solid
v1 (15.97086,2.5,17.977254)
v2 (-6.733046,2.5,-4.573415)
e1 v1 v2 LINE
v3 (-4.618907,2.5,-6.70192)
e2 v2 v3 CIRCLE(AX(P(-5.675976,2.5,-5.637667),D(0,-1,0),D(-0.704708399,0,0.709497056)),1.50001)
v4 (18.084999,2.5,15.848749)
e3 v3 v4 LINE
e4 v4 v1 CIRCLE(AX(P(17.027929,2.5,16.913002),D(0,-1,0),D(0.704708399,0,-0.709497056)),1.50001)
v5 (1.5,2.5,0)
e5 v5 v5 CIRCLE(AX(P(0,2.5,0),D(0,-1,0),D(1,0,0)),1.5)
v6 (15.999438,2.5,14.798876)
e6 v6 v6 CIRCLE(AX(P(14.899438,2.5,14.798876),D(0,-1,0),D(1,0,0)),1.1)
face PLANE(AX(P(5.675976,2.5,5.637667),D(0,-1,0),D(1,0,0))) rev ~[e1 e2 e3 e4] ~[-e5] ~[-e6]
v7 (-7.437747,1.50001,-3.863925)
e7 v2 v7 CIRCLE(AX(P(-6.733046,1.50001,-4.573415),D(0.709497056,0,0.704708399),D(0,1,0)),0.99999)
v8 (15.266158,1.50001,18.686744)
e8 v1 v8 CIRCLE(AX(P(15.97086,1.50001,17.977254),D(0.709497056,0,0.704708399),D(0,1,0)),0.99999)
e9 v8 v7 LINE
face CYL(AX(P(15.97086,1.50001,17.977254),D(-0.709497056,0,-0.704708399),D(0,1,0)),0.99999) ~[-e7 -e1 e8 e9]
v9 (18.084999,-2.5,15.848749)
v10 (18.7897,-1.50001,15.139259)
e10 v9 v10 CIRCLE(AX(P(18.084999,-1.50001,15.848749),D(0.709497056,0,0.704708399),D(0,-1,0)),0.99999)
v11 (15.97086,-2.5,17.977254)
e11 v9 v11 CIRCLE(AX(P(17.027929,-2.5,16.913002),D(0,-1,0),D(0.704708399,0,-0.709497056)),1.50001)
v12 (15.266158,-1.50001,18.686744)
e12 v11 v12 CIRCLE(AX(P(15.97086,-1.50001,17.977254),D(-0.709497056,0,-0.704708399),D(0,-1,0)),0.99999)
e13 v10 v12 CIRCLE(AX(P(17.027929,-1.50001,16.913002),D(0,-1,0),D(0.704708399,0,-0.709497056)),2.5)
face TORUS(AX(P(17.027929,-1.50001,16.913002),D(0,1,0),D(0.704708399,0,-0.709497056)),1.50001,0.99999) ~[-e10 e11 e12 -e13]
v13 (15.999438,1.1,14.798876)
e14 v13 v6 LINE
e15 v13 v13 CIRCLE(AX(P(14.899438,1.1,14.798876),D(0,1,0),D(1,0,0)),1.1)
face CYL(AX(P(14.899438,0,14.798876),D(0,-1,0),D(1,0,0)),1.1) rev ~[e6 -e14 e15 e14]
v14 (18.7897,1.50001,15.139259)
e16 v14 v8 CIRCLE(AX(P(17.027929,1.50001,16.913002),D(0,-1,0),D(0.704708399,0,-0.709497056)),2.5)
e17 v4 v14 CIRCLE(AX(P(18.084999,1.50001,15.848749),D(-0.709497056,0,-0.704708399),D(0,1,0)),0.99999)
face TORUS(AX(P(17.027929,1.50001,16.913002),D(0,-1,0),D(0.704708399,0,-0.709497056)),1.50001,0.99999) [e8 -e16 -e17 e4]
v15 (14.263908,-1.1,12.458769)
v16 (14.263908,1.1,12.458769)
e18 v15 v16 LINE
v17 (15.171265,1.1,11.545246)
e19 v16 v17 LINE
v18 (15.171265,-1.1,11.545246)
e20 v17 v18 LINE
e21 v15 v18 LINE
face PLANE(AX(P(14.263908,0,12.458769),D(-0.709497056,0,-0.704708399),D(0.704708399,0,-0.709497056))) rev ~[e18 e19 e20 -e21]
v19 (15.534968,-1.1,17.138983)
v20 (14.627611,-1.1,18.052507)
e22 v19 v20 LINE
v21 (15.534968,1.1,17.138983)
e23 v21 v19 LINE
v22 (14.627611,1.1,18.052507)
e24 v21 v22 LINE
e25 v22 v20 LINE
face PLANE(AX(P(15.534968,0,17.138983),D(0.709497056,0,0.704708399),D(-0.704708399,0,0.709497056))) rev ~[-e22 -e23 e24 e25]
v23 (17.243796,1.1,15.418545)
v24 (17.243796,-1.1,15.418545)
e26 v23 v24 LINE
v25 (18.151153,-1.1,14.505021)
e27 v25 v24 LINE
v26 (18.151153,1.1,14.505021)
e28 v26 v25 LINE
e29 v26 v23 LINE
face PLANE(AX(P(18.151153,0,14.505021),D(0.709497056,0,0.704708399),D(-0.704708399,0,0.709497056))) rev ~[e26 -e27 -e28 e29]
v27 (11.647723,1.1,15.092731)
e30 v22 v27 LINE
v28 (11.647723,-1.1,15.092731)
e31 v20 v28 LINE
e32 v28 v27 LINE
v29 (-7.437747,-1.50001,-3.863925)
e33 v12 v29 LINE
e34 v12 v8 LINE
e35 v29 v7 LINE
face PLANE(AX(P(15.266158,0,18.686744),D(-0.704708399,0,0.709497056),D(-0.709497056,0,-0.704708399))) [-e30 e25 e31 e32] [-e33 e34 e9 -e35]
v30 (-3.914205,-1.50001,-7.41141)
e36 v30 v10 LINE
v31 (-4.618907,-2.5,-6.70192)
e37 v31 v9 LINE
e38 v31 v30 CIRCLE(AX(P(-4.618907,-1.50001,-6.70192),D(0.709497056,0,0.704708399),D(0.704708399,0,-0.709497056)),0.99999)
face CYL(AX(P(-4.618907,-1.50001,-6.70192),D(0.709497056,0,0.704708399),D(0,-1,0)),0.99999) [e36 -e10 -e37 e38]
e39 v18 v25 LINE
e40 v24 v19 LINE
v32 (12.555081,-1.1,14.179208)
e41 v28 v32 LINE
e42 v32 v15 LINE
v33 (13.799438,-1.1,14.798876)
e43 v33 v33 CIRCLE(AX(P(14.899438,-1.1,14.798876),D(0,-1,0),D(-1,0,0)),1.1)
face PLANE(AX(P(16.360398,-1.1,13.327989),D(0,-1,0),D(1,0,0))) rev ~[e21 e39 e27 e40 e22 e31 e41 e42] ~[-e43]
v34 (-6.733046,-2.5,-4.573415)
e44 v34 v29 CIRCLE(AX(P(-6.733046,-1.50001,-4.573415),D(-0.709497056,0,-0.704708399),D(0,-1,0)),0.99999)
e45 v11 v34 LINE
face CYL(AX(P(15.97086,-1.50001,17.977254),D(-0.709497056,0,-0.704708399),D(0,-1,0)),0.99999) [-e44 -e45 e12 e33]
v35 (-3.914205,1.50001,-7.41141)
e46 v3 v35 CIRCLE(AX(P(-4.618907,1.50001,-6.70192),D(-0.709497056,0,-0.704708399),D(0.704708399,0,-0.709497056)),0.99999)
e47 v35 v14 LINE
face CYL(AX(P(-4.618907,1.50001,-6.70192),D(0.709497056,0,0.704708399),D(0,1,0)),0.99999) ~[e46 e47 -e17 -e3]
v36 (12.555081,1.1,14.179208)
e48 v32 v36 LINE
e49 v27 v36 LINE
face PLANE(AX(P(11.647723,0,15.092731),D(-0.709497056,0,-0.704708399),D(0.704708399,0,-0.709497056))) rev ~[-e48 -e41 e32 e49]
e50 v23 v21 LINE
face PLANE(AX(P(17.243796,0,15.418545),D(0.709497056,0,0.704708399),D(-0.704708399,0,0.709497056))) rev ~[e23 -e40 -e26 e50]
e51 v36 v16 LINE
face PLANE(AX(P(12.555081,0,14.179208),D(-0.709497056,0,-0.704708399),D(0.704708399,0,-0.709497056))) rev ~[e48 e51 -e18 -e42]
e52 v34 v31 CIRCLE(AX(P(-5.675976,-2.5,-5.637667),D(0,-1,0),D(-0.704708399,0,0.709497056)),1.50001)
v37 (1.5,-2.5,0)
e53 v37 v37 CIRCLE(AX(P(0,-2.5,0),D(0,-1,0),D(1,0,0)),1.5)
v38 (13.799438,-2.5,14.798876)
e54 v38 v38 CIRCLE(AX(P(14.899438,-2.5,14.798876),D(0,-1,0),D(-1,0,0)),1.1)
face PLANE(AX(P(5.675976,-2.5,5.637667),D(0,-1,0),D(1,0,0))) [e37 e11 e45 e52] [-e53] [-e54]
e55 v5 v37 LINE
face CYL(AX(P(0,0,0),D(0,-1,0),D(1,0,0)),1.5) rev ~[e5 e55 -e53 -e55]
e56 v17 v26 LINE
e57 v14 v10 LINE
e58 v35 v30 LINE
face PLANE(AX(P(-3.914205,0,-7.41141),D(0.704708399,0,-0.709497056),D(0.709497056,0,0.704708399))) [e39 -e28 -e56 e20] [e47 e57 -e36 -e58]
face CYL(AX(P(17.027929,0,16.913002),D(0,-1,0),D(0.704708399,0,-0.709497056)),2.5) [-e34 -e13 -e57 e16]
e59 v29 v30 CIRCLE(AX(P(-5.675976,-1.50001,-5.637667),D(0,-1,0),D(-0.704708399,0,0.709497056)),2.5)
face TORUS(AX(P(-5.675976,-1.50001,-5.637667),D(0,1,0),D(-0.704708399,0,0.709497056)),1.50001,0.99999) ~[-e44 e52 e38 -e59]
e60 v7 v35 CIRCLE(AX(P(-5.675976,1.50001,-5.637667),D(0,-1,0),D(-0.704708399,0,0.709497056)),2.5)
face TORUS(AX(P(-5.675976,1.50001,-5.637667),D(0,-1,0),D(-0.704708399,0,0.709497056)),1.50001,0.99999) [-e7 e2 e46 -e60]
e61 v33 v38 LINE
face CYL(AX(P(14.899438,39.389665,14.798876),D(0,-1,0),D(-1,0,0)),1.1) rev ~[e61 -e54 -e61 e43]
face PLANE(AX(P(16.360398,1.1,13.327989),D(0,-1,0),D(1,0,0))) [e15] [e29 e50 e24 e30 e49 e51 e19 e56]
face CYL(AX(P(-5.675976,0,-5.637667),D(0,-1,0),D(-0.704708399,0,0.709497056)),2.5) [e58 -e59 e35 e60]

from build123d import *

# Parameters (mm, degrees)
F0_R     = 1.5
F1_DEPTH = 2.5
F2_DEPTH = 5
F3_R     = 0.99999
F6_DEPTH = 1.1
F7_D     = 2.2
F7_DEPTH = 2.501
F8_D     = 2.2


# Not quite as in the source:
# - a fillet or chamfer is up to 0.001 mm smaller than in the source, because OpenCascade refuses the exact size


with BuildPart() as f1:
    # F0 (on Front) → F1 (new body, symmetric)
    with BuildSketch(Plane.XZ):
        with BuildLine():
            ThreePointArc((-7.4377474476, -3.8639245472), (-7.4497190923, -7.3994381845), (-3.9142054549, -7.4114098292))
            Line((-3.9142054549, -7.4114098292), (18.78970035, 15.1392589236))
            ThreePointArc((18.78970035, 15.1392589236), (18.8016719947, 18.6747725609), (15.2661583574, 18.6867442056))
            Line((15.2661583574, 18.6867442056), (-7.4377474476, -3.8639245472))
        make_face()
        Circle(F0_R, mode=Mode.SUBTRACT)
        Circle(F0_R)
    extrude(amount=F1_DEPTH, both=True)

    # F0 (on Front) → F2 (cut, symmetric)
    with BuildSketch(Plane.XZ):
        Circle(F0_R)
    extrude(amount=F2_DEPTH, both=True, mode=Mode.SUBTRACT)

    # F3 (radius 1 in the source; OpenCascade refuses exactly that, so slightly less here)
    f3_edges = [f1.edges().sort_by_distance(p)[0] for p in [
        (3.914205, -2.5, 7.41141),
        (3.914205, 2.5, 7.41141),
    ]]
    fillet(f3_edges, radius=F3_R)

    # F5 (on Front) → F6 (cut, symmetric)
    with BuildSketch(Plane.XZ):
        Polygon((17.2437955285, 15.4185445413), (16.6082652356, 13.0784374397), (14.2639078916, 12.4587692675), (15.1712653624, 11.5452460911), (18.1511529993, 14.5050213649), align=None)
        Polygon((14.2639078916, 12.4587692675), (16.6082652356, 13.0784374397), (17.2437955285, 15.4185445413), (15.5349684774, 17.1389834706), (13.1906111334, 16.5193152984), (12.5550808405, 14.1792081968), align=None)
        Polygon((11.6477233698, 15.0927313731), (12.5550808405, 14.1792081968), (13.1906111334, 16.5193152984), (15.5349684774, 17.1389834706), (14.6276110067, 18.0525066469), align=None)
    extrude(amount=F6_DEPTH, both=True, mode=Mode.SUBTRACT)

    # F7 (through all, one way)
    with BuildSketch(Plane.XZ):
        with Locations((14.8994381845, 14.798876369)):
            Circle(F7_D / 2)
    extrude(amount=-F7_DEPTH, mode=Mode.SUBTRACT)

    # F8 (through all)
    with Locations(Plane(origin=(0, 0, 0), x_dir=(1, 0, 0), z_dir=(0, 1, 0))):
        with Locations((14.8994381845, -14.798876369)):
            Hole(F8_D / 2)


solid = f1.part
